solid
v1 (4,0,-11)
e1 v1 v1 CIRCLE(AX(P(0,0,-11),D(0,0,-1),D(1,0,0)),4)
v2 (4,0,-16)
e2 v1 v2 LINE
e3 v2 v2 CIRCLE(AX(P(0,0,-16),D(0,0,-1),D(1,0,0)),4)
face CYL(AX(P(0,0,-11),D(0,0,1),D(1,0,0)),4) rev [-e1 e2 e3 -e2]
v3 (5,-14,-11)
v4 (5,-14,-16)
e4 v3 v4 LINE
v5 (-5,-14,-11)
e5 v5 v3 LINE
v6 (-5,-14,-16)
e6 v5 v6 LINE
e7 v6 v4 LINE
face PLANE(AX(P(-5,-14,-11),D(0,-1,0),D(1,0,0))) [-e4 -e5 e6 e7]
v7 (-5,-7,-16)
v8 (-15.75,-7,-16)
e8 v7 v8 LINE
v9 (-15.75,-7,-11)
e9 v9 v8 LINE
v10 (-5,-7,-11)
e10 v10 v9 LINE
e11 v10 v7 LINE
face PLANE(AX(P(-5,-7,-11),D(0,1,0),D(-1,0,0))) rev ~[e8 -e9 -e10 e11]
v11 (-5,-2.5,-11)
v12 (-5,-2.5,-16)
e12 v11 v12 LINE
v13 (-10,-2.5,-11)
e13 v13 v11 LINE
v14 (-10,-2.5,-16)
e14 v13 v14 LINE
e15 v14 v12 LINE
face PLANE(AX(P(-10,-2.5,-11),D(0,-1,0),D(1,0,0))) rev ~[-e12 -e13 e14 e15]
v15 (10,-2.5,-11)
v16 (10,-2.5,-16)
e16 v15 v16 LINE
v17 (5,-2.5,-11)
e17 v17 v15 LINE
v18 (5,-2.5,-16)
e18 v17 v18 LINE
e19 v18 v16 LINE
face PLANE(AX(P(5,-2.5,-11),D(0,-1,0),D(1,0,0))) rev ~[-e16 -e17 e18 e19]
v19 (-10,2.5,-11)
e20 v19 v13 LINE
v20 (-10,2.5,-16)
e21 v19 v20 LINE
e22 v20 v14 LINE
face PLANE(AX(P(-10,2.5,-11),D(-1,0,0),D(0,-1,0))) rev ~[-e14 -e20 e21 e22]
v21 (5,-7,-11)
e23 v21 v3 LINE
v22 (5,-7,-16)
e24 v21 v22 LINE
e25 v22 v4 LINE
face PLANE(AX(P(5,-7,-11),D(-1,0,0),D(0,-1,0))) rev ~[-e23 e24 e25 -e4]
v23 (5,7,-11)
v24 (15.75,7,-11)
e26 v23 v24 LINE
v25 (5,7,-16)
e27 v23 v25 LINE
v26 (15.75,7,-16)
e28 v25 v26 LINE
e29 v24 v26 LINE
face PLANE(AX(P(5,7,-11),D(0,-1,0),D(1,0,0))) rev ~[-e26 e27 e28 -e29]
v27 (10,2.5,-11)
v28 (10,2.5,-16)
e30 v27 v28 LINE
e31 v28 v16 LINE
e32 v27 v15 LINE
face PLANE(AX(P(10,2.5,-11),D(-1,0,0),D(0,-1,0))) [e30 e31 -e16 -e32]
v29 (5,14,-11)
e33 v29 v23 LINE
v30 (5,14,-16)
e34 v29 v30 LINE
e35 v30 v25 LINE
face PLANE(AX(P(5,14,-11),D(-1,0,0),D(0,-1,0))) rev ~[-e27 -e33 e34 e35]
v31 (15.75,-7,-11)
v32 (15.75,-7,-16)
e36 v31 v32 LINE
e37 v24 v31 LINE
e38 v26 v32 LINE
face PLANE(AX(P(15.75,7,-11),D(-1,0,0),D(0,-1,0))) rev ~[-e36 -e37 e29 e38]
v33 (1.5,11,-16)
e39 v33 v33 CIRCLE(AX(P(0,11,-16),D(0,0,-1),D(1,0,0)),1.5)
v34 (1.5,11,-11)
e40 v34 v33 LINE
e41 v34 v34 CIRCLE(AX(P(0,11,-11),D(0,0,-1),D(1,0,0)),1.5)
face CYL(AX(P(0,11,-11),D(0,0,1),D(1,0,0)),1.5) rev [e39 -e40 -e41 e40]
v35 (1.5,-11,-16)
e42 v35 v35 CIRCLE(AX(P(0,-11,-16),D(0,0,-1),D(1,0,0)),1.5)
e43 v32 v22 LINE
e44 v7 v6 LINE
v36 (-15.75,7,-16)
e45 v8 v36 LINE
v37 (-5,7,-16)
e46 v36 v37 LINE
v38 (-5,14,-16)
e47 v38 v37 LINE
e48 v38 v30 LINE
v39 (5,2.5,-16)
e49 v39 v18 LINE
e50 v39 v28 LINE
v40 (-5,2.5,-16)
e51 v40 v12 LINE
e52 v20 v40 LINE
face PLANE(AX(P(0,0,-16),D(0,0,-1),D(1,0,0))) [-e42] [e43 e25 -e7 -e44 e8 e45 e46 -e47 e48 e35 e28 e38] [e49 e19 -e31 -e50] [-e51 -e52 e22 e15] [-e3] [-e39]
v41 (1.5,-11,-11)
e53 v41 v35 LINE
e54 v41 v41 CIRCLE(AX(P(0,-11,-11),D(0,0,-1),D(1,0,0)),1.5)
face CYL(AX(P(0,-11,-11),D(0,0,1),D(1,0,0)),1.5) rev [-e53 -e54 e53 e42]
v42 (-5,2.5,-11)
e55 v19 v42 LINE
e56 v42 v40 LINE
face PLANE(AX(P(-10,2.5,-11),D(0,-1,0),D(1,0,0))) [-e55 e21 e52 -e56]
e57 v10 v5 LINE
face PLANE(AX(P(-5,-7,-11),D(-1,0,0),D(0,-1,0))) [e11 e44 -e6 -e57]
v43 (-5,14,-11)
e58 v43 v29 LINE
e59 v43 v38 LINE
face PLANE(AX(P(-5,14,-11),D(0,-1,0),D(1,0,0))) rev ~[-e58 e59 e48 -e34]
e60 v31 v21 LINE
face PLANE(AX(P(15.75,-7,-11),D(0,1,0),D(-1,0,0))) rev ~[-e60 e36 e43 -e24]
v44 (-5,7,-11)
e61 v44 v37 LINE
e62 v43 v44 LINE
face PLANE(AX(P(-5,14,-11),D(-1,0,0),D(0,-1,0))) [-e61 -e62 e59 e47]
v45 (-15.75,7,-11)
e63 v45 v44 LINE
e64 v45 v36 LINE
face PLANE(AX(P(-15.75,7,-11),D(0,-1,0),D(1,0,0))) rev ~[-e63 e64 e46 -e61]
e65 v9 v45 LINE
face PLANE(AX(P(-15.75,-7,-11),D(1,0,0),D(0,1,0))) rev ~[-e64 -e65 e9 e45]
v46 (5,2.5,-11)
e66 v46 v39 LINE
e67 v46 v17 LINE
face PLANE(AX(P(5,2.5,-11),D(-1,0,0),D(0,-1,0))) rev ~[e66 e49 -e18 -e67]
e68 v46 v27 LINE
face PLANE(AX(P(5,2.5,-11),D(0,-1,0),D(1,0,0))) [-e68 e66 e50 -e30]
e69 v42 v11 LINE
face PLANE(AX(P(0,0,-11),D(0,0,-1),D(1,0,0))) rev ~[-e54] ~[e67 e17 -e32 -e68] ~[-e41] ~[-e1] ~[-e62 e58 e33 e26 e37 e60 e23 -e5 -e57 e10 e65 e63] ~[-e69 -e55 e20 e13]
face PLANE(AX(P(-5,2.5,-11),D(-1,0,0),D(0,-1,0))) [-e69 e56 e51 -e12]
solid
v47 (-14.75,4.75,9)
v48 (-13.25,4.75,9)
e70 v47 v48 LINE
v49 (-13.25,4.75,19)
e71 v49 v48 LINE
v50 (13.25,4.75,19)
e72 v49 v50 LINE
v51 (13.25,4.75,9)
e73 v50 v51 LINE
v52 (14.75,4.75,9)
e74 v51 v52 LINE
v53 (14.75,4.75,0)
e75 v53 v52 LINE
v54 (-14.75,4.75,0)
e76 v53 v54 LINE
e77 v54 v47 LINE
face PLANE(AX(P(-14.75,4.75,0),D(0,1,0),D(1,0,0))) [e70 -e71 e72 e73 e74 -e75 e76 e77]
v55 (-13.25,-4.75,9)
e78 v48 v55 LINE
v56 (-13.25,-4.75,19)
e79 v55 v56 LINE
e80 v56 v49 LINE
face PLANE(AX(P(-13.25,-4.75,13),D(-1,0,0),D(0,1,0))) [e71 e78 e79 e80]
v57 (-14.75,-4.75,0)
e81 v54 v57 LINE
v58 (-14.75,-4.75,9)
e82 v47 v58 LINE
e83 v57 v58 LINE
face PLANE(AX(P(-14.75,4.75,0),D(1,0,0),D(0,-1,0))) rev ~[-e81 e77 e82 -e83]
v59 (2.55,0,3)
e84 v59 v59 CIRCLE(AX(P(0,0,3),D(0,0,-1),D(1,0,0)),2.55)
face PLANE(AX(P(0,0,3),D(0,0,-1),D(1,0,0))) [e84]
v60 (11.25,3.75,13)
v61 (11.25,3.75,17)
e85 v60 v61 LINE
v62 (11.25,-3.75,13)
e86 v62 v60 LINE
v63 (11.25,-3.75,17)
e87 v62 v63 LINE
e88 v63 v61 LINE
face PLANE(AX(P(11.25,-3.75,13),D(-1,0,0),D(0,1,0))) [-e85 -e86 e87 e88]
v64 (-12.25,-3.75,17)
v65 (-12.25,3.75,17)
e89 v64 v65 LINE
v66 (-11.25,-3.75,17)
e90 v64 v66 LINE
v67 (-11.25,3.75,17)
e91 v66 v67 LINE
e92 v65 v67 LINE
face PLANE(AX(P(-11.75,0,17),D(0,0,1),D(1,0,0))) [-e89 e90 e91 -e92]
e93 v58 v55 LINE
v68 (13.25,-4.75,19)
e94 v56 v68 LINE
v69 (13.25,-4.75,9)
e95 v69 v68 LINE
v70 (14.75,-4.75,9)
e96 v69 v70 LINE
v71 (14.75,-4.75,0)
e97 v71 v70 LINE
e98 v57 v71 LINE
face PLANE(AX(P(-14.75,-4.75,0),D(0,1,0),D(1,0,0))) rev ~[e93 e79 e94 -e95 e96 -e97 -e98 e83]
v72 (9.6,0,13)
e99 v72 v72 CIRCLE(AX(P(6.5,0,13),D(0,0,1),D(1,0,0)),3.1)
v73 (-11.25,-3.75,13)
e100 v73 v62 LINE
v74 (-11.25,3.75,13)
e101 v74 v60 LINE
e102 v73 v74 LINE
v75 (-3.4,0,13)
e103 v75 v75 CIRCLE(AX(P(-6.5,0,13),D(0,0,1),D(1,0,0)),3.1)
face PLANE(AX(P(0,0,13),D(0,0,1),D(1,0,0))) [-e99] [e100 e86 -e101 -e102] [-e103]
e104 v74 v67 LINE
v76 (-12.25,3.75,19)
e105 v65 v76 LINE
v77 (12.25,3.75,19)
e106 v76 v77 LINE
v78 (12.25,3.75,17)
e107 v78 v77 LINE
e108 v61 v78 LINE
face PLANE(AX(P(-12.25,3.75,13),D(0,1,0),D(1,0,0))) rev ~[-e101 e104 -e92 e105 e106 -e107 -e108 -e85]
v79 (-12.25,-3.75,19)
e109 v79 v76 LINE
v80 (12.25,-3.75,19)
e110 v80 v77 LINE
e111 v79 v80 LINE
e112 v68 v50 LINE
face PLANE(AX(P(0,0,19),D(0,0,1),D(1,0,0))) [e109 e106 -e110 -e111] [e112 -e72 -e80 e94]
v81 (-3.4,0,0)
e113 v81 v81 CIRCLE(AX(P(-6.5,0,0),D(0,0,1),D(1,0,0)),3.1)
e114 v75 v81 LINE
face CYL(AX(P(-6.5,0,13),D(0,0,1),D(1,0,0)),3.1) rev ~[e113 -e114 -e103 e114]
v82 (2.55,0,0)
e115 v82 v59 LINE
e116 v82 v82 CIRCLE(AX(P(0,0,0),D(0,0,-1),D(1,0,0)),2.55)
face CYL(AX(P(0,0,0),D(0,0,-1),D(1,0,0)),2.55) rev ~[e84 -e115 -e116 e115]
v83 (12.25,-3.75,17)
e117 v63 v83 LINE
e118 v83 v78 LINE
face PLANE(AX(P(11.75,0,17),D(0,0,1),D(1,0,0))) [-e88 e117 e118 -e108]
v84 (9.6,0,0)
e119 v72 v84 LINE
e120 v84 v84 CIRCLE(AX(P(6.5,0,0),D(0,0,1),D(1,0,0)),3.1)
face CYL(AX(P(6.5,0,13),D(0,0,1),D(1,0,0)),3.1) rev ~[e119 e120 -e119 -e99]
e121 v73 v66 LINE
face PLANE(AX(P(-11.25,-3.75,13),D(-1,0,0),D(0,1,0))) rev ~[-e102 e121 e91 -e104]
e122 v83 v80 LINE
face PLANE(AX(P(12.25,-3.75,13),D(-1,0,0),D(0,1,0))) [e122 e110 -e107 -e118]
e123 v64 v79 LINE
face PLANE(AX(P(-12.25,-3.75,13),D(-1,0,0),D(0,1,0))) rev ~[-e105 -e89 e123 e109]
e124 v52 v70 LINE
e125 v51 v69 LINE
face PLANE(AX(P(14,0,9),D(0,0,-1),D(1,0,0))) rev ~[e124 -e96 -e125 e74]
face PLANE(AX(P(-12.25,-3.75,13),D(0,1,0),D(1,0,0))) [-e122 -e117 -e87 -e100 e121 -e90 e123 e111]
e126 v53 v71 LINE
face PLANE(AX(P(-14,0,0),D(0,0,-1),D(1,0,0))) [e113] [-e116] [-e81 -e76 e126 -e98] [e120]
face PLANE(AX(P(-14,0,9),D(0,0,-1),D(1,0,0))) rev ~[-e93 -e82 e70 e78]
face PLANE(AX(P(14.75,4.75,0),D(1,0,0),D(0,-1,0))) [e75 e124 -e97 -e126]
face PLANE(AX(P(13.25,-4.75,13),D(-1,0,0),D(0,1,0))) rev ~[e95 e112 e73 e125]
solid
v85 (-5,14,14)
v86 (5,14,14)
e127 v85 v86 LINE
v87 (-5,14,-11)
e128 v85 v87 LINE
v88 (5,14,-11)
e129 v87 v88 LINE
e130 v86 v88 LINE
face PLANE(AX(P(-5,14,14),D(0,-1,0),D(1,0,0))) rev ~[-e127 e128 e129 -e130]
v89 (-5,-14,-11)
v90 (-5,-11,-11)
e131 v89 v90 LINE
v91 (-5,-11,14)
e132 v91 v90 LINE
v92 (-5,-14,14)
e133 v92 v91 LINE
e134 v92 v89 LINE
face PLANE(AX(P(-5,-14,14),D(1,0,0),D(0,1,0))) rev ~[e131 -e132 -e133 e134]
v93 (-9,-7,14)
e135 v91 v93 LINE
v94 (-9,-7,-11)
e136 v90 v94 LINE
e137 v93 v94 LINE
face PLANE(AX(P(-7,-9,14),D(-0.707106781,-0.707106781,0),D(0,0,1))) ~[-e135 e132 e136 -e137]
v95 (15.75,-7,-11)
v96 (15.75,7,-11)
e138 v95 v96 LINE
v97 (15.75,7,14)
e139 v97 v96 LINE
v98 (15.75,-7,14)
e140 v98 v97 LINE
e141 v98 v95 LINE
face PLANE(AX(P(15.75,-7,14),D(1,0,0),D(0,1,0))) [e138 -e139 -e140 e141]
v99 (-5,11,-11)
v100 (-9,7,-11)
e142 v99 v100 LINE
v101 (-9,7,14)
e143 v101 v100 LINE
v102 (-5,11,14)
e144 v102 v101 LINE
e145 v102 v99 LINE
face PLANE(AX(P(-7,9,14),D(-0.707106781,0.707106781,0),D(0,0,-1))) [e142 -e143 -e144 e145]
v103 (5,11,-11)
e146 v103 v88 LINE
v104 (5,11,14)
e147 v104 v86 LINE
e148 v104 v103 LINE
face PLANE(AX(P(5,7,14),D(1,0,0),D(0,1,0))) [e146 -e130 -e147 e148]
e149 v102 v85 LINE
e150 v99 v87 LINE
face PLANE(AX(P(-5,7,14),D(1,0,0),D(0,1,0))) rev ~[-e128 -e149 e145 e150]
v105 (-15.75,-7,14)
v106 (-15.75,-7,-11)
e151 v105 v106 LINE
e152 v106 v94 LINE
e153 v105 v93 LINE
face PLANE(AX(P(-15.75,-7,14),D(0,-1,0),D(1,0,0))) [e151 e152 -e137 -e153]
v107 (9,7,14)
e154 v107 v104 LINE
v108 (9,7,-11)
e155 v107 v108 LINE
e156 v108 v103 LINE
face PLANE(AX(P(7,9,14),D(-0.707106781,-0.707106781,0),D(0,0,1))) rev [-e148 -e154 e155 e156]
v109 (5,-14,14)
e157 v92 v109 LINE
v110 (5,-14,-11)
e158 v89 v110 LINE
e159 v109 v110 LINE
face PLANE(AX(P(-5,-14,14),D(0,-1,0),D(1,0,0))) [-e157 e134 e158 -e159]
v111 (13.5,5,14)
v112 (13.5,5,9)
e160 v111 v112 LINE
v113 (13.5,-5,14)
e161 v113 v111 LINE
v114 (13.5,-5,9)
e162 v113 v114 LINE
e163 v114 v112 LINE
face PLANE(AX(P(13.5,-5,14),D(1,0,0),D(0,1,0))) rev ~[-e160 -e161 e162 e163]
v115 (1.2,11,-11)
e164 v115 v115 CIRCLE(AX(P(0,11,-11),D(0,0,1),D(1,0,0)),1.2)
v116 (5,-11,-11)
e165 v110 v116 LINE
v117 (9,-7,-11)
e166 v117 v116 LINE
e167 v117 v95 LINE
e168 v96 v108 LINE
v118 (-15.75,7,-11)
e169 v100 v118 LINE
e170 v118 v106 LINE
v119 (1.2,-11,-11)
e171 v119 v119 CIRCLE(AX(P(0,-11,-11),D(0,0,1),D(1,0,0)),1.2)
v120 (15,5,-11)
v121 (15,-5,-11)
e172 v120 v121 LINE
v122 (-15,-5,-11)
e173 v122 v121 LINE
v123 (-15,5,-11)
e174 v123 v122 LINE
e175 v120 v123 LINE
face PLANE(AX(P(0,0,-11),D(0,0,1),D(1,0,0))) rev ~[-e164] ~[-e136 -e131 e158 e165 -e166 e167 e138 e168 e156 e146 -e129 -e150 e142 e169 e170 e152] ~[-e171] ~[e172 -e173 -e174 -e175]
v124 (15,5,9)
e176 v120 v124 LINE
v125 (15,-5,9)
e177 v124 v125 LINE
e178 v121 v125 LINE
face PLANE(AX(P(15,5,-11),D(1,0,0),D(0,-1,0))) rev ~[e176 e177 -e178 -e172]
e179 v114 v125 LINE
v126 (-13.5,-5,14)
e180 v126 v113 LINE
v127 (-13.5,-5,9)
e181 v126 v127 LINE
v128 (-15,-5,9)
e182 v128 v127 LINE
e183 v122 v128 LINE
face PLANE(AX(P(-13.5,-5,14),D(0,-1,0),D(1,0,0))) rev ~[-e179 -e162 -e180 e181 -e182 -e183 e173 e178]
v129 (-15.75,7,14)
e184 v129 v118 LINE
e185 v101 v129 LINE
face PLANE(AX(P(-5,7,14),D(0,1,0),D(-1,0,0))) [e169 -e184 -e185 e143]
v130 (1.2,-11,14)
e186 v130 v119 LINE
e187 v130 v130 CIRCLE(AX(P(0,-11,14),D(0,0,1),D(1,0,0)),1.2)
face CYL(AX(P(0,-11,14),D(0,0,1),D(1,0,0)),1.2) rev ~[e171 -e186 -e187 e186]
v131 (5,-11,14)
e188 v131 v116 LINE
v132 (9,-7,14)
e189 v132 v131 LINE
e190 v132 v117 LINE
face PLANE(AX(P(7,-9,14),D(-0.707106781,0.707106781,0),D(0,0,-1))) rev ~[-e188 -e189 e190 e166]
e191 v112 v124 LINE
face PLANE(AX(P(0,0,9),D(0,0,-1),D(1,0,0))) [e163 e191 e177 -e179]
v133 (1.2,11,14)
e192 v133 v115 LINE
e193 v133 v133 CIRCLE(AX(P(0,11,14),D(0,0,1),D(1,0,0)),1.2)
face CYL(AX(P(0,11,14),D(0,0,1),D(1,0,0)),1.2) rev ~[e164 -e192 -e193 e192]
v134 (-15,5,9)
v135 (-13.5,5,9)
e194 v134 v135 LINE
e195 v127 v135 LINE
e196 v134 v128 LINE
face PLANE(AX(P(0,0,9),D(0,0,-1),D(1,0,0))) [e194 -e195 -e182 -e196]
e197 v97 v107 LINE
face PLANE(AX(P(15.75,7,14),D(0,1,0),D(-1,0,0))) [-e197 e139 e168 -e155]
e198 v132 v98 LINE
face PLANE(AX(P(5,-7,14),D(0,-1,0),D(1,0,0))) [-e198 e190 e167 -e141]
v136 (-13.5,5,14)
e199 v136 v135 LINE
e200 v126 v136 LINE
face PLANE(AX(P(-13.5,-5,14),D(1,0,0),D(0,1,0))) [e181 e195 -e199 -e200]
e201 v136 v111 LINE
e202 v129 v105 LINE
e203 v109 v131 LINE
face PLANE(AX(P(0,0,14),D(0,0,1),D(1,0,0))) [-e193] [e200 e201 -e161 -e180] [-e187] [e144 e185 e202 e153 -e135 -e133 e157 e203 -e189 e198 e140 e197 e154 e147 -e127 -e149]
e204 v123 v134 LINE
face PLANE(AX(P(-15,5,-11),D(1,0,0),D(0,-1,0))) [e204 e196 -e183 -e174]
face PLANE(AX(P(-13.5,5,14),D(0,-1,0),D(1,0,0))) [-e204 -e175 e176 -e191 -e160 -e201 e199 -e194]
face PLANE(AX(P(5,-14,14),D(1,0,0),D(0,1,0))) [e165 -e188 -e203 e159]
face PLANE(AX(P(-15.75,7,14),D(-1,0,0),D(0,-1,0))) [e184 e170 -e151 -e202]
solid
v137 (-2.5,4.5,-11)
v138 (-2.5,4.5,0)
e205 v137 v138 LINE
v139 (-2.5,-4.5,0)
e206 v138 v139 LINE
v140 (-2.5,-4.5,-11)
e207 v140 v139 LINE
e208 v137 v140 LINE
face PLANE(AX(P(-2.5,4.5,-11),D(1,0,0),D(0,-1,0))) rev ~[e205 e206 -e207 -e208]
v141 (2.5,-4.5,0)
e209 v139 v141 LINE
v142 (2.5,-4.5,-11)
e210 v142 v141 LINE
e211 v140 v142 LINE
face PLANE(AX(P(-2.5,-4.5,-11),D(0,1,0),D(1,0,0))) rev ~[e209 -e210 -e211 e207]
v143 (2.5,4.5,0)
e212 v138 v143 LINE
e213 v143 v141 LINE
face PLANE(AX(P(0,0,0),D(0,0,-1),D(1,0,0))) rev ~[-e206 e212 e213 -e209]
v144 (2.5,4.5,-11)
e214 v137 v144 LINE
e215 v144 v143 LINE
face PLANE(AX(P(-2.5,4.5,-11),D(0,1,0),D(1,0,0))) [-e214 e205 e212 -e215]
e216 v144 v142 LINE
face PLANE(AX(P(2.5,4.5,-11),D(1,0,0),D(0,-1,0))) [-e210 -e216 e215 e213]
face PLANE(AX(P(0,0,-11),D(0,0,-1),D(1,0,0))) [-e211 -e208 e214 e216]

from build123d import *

# Parameters (mm, degrees)
F0_W      = 26.5
F0_H      = 9.5
F1_DEPTH  = 13
F2_W      = 26.5
F2_H      = 9.5
F2_W_2    = 24.5
F2_H_2    = 7.5
F3_DEPTH  = 6
F4_W      = 1
F4_H      = 7.5
F5_DEPTH  = 4
F6_R      = 3.1
F7_DEPTH  = 19
F8_W      = 1.5
F8_H      = 9.5
F9_DEPTH  = 9
F10_R     = 2.55
F11_DEPTH = 3
F13_W     = 27
F13_H     = 10
F13_W_2   = 10
F13_H_2   = 7
F14_DEPTH = 25
F15_W     = 30
F15_H     = 10
F16_DEPTH = 20
F17_R     = 1.2
F18_DEPTH = 25
F19_W     = 5
F19_H     = 5
F19_R     = 4
F19_W_2   = 10
F19_H_2   = 7
F19_R_2   = 1.5
F20_DEPTH = 5
F21_SIZE  = 4
F23_W     = 5
F23_H     = 9
F24_DEPTH = 11


with BuildPart() as f1:
    # F0 (on Top) → F1 (new body)
    with BuildSketch(Plane.XY):
        Rectangle(F0_W, F0_H)
    extrude(amount=F1_DEPTH)

    # F2 (on face) → F3 (join)
    with BuildSketch(Plane.XY.offset(13)):
        Rectangle(F2_W, F2_H)
        Rectangle(F2_W_2, F2_H_2, mode=Mode.SUBTRACT)
    extrude(amount=F3_DEPTH)

    # F4 (on face) → F5 (join)
    with BuildSketch(Plane.XY.offset(13)):
        with Locations((-11.75, 0)):
            Rectangle(F4_W, F4_H)
        with Locations((11.75, 0)):
            Rectangle(F4_W, F4_H)
    extrude(amount=F5_DEPTH)

    # F6 (on face) → F7 (cut)
    with BuildSketch(Plane.XY.offset(13)):
        with Locations((-6.5, 0)):
            Circle(F6_R)
        with Locations((6.5, 0)):
            Circle(F6_R)
    extrude(amount=-F7_DEPTH, mode=Mode.SUBTRACT)

    # F8 (on face) → F9 (join)
    with BuildSketch(Plane(origin=(0, 0, 0), x_dir=(1, 0, 0), z_dir=(0, 0, -1))):
        with Locations((-14, 0)):
            Rectangle(F8_W, F8_H)
        with Locations((14, 0)):
            Rectangle(F8_W, F8_H)
    extrude(amount=-F9_DEPTH)

    # F10 (on face) → F11 (cut)
    with BuildSketch(Plane(origin=(0, 0, 0), x_dir=(1, 0, 0), z_dir=(0, 0, -1))):
        Circle(F10_R)
    extrude(amount=-F11_DEPTH, mode=Mode.SUBTRACT)


with BuildPart() as f14:
    # F13 (on offset) → F14 (new body)
    with BuildSketch(Plane.XY.offset(14)):
        Polygon((5, -7), (15.75, -7), (15.75, 7), (5, 7), (-5, 7), (-15.75, 7), (-15.75, -7), (-5, -7), align=None)
        Rectangle(F13_W, F13_H, mode=Mode.SUBTRACT)
        with Locations((0, -10.5)):
            Rectangle(F13_W_2, F13_H_2)
        with Locations((0, 10.5)):
            Rectangle(F13_W_2, F13_H_2)
    extrude(amount=-F14_DEPTH)

    # F15 (on face) → F16 (cut)
    with BuildSketch(Plane(origin=(0, 0, -11), x_dir=(1, 0, 0), z_dir=(0, 0, -1))):
        Rectangle(F15_W, F15_H)
    extrude(amount=-F16_DEPTH, mode=Mode.SUBTRACT)

    # F17 (on face) → F18 (cut)
    with BuildSketch(Plane.XY.offset(14)):
        with Locations((0, 11)):
            Circle(F17_R)
        with Locations((0, -11)):
            Circle(F17_R)
    extrude(amount=-F18_DEPTH, mode=Mode.SUBTRACT)

    # F21
    f21_edges = [f14.edges().sort_by_distance(p)[0] for p in [
        (-5, 7, 1.5),
        (5, 7, 1.5),
        (5, -7, 1.5),
        (-5, -7, 1.5),
    ]]
    chamfer(f21_edges, length=F21_SIZE)


with BuildPart() as f20:
    # F19 (on face) → F20 (new body)
    with BuildSketch(Plane(origin=(0, 0, -11), x_dir=(1, 0, 0), z_dir=(0, 0, -1))):
        Polygon((5, -7), (15.75, -7), (15.75, 7), (5, 7), (-5, 7), (-15.75, 7), (-15.75, -7), (-5, -7), align=None)
        with Locations((-7.5, 0)):
            Rectangle(F19_W, F19_H, mode=Mode.SUBTRACT)
        Circle(F19_R, mode=Mode.SUBTRACT)
        with Locations((7.5, 0)):
            Rectangle(F19_W, F19_H, mode=Mode.SUBTRACT)
        with Locations((0, -10.5)):
            Rectangle(F19_W_2, F19_H_2)
        with Locations((0, -11)):
            Circle(F19_R_2, mode=Mode.SUBTRACT)
        with Locations((0, 10.5)):
            Rectangle(F19_W_2, F19_H_2)
        with Locations((0, 11)):
            Circle(F19_R_2, mode=Mode.SUBTRACT)
    extrude(amount=F20_DEPTH)


with BuildPart() as f24:
    # F23 (on offset) → F24 (new body)
    with BuildSketch(Plane(origin=(0, 0, -11), x_dir=(1, 0, 0), z_dir=(0, 0, -1))):
        Rectangle(F23_W, F23_H)
    extrude(amount=-F24_DEPTH)


solid = Compound([f1.part, f14.part, f20.part, f24.part])
